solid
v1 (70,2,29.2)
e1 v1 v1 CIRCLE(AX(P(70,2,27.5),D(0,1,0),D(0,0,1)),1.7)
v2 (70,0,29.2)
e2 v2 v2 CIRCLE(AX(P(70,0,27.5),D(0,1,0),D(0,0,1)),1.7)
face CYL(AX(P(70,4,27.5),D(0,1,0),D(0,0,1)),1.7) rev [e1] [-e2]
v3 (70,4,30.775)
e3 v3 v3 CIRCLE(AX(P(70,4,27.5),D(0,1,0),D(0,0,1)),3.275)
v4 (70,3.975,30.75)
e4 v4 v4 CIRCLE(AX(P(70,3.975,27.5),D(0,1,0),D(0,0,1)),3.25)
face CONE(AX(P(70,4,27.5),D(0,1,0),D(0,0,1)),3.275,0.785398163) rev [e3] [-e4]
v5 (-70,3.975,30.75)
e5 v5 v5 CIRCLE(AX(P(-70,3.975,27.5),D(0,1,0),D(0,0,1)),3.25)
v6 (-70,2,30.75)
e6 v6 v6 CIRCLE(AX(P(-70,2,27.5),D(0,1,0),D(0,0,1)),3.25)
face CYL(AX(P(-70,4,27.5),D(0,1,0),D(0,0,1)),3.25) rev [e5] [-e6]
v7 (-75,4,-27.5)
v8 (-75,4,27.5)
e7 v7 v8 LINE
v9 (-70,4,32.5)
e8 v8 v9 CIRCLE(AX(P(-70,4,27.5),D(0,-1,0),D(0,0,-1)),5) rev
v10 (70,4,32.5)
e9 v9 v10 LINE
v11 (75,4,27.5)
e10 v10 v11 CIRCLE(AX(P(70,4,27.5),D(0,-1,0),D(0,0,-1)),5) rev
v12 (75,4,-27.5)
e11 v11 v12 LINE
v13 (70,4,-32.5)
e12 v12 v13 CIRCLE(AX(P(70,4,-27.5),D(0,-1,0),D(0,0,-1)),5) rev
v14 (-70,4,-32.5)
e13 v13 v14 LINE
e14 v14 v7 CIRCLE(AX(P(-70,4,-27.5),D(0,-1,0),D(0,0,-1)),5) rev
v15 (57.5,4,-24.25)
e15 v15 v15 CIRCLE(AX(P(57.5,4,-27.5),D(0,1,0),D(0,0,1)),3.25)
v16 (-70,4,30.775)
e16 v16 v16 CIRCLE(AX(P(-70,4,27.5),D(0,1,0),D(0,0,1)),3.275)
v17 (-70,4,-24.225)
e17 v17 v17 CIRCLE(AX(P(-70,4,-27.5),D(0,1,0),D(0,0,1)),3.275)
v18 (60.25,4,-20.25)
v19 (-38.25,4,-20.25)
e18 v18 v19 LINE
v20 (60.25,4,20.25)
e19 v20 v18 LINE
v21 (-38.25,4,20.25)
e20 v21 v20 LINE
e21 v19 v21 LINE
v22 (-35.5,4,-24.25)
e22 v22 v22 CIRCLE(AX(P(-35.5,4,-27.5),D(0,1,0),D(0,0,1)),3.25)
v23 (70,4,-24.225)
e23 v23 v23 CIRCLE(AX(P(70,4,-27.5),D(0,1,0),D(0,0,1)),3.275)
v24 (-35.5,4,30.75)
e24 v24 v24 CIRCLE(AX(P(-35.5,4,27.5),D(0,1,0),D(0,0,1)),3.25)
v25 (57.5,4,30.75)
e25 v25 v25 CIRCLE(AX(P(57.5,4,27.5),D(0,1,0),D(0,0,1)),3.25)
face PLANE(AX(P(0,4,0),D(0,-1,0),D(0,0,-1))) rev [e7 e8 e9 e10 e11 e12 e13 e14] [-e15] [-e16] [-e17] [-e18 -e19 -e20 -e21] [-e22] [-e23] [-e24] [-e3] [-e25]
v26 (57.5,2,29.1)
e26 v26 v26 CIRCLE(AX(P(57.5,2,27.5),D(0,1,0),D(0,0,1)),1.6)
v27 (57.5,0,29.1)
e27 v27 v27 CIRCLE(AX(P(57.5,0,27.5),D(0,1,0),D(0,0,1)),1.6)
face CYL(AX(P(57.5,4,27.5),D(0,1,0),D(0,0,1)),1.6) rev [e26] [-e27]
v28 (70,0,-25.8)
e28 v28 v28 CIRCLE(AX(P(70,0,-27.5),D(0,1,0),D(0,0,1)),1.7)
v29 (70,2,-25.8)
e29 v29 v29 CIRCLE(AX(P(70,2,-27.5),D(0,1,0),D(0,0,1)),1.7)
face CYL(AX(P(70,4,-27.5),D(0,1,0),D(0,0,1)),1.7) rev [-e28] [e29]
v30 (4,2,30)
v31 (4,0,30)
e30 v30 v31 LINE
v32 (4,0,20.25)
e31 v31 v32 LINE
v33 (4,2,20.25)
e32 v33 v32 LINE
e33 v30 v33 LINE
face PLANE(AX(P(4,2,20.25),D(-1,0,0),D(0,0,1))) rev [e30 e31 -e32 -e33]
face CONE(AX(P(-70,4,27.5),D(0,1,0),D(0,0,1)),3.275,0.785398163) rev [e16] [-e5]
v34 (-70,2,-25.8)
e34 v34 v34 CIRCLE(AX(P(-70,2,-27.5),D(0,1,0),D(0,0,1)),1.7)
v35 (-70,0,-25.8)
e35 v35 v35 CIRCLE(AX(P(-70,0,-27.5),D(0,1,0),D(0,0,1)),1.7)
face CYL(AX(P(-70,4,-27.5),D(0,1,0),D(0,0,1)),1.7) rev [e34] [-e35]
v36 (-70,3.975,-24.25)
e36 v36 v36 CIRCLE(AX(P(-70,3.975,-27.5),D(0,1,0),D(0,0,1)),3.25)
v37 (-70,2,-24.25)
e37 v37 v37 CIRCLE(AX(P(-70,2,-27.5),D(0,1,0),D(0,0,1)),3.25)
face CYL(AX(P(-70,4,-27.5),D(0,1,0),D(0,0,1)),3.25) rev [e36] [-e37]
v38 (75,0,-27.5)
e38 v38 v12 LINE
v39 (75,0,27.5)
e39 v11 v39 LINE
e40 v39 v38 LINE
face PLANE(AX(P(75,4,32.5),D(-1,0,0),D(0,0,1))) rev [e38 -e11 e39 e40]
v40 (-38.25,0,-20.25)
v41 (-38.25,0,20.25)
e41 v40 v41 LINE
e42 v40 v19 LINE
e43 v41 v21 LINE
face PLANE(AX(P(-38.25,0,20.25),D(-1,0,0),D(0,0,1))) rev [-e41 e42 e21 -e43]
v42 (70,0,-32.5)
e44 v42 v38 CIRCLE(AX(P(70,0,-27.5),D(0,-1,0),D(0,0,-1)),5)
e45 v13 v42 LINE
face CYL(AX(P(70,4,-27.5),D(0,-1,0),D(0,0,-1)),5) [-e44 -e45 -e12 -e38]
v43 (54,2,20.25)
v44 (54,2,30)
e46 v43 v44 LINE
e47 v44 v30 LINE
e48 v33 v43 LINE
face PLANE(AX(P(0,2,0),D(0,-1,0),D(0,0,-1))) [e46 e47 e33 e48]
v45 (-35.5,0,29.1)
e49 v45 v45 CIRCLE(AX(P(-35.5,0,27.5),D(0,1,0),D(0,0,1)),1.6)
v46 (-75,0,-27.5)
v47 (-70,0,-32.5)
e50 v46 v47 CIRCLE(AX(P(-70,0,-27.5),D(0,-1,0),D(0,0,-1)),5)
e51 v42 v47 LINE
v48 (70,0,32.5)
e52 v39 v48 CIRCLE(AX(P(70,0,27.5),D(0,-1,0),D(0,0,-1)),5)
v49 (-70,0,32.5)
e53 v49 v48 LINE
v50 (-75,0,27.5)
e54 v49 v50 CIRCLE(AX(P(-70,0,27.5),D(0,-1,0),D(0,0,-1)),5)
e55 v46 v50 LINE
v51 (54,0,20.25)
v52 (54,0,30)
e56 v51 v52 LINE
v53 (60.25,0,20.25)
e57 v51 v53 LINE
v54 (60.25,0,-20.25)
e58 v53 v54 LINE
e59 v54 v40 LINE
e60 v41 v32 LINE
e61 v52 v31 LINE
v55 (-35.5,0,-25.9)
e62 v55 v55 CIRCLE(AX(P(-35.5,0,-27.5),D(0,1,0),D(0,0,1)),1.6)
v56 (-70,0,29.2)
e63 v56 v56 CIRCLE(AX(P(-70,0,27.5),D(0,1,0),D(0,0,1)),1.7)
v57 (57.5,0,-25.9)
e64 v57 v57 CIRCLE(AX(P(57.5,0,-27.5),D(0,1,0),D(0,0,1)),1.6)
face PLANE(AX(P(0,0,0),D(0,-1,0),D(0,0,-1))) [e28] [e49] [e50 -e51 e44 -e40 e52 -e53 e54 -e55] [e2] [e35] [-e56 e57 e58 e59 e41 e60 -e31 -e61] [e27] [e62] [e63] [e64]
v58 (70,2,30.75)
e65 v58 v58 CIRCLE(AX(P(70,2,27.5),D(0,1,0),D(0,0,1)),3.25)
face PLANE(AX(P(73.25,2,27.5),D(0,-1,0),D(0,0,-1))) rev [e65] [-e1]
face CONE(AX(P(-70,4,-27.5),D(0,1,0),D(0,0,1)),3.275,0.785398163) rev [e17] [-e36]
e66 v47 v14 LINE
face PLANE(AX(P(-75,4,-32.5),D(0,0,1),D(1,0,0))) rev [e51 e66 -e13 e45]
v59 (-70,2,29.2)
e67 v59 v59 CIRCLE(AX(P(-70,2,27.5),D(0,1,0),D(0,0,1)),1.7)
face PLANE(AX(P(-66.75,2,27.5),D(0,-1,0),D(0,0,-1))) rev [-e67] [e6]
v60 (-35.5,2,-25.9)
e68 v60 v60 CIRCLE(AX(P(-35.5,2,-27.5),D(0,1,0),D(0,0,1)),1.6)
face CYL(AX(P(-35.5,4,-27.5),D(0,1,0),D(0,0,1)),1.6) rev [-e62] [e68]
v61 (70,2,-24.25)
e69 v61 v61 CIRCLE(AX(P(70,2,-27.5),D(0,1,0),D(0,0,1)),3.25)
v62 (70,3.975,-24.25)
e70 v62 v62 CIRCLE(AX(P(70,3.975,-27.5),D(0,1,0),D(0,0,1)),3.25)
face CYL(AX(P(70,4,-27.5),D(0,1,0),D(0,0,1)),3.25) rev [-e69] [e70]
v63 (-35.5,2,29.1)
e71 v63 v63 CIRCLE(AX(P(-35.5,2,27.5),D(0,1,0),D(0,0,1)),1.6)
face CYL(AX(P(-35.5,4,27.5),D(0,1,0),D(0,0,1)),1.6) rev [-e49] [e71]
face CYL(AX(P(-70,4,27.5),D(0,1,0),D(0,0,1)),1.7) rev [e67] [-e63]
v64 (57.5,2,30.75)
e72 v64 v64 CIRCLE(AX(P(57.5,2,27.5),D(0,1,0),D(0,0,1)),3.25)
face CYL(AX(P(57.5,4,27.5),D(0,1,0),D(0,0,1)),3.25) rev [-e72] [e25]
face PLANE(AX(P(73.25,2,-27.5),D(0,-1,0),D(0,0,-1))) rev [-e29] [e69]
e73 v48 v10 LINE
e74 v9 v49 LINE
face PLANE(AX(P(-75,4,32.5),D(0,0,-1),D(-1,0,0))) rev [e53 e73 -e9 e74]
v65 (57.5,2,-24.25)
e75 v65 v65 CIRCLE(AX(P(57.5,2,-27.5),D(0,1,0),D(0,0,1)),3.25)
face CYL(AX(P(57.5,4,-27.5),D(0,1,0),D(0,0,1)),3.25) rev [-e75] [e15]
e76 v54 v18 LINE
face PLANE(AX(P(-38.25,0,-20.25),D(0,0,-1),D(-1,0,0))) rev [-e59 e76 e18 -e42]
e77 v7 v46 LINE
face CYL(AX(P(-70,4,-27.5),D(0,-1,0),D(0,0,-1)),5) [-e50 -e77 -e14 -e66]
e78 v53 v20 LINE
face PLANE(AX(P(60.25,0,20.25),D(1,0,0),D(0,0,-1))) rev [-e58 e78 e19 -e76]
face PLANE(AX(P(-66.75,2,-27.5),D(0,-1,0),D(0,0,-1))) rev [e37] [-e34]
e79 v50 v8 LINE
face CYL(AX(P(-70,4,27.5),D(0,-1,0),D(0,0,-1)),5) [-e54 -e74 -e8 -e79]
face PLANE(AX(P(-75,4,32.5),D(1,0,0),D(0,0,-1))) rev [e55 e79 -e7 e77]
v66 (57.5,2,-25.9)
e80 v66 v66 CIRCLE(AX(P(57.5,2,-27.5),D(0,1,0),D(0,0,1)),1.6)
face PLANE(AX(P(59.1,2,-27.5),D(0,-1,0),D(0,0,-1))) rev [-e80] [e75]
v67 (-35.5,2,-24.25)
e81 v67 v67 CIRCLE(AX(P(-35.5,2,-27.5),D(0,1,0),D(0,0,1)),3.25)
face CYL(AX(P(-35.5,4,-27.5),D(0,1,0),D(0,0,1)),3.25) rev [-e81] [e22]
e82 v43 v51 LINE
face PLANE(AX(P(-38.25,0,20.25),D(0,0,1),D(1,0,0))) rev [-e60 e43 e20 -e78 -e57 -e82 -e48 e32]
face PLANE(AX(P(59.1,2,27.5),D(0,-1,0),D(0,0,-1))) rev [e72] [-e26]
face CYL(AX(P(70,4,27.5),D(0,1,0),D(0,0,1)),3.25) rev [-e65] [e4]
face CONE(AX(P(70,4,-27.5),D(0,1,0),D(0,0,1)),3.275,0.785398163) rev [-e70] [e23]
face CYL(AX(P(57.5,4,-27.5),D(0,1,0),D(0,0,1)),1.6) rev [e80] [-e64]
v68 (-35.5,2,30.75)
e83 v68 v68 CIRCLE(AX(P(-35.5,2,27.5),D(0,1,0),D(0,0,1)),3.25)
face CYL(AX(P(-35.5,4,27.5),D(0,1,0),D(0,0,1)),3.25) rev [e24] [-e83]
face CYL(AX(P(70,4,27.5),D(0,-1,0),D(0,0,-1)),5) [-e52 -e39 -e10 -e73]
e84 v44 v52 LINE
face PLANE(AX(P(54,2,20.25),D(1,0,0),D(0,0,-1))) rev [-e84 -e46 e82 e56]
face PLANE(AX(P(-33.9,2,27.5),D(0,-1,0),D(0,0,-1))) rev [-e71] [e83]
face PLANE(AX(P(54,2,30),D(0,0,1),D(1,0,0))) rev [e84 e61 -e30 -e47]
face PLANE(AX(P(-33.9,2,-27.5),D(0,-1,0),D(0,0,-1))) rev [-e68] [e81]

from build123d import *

# Parameters (mm, degrees)
SKETCH1_W                          = 150
SKETCH1_H                          = 65
BODY_DEPTH                         = 4
EDGE_FILLETS_R                     = 5
SKETCH5_W                          = 98.5
SKETCH5_H                          = 40.5
LCD2004_SCREEN_CUTOUT_DEPTH        = 82.836727696
LCD2004_MOUNTING_HOLES_START       = 2
LCD2004_MOUNTING_HOLES_OUTLINE_R   = 3.25
LCD2004_MOUNTING_HOLES_DEPTH       = 2
LCD2004_MOUNTING_HOLES_2_OUTLINE_R = 1.6
LCD2004_MOUNTING_HOLES_2_DEPTH     = 2
SKETCH8_W                          = 50
SKETCH8_H                          = 9.75
LCD2004_SOLDERING_CUTOUT_DEPTH     = 2


# Read off the part's stored shape, not the designer's step: mounting_holes, lcd2004_mounting_holes
with BuildPart() as part:
    # Sketch1 → body (new body)
    with BuildSketch(Plane(origin=(0, 0, 0), x_dir=(1, 0, 0), z_dir=(0, 1, 0))):
        Rectangle(SKETCH1_W, SKETCH1_H)
    extrude(amount=BODY_DEPTH)

    # mounting_holes outline → mounting_holes (revolve, cut)
    with BuildSketch(Plane(origin=(70, 0, 27.5), x_dir=(1, 0, 0), z_dir=(0, 0, 1))):
        Polygon((0, 0), (1.7, 0), (1.7, 2), (3.25, 2), (3.25, 3.975), (3.275, 4), (0, 4), align=None)
    revolve(axis=Axis((70, 0, 27.5), (0, 1, 0)), mode=Mode.SUBTRACT)

    # mounting_holes 2 outline → mounting_holes 2 (revolve, cut)
    with BuildSketch(Plane(origin=(-70, 0, -27.5), x_dir=(1, 0, 0), z_dir=(0, 0, 1))):
        Polygon((0, 4), (0, 0), (1.7, 0), (1.7, 2), (3.25, 2), (3.25, 3.975), (3.275, 4), align=None)
    revolve(axis=Axis((-70, 0, -27.5), (0, 1, 0)), mode=Mode.SUBTRACT)

    # mounting_holes 3 outline → mounting_holes 3 (revolve, cut)
    with BuildSketch(Plane(origin=(70, 0, -27.5), x_dir=(1, 0, 0), z_dir=(0, 0, 1))):
        Polygon((0, 4), (0, 0), (1.7, 0), (1.7, 2), (3.25, 2), (3.25, 3.975), (3.275, 4), align=None)
    revolve(axis=Axis((70, 0, -27.5), (0, 1, 0)), mode=Mode.SUBTRACT)

    # mounting_holes 4 outline → mounting_holes 4 (revolve, cut)
    with BuildSketch(Plane(origin=(-70, 0, 27.5), x_dir=(1, 0, 0), z_dir=(0, 0, 1))):
        Polygon((0, 4), (0, 0), (1.7, 0), (1.7, 2), (3.25, 2), (3.25, 3.975), (3.275, 4), align=None)
    revolve(axis=Axis((-70, 0, 27.5), (0, 1, 0)), mode=Mode.SUBTRACT)

    # edge_fillets
    edge_fillets_edges = [part.edges().sort_by_distance(p)[0] for p in [
        (75, 2, 32.5),
        (-75, 2, 32.5),
        (-75, 2, -32.5),
        (75, 2, -32.5),
    ]]
    fillet(edge_fillets_edges, radius=EDGE_FILLETS_R)

    # Sketch5 → lcd2004_screen_cutout (cut, through all)
    with BuildSketch(Plane(origin=(0, 4, 0), x_dir=(1, 0, 0), z_dir=(0, 1, 0))):
        with Locations((11, 0)):
            Rectangle(SKETCH5_W, SKETCH5_H)
    extrude(amount=-LCD2004_SCREEN_CUTOUT_DEPTH, mode=Mode.SUBTRACT)

    # lcd2004_mounting_holes outline → lcd2004_mounting_holes (cut)
    with BuildSketch(Plane(origin=(0, 0, 0), x_dir=(1, 0, 0), z_dir=(0, 1, 0)).offset(LCD2004_MOUNTING_HOLES_START)):
        with Locations((57.5, 27.5)):
            Circle(LCD2004_MOUNTING_HOLES_OUTLINE_R)
        with Locations((-35.5, -27.5)):
            Circle(LCD2004_MOUNTING_HOLES_OUTLINE_R)
        with Locations((57.5, -27.5)):
            Circle(LCD2004_MOUNTING_HOLES_OUTLINE_R)
        with Locations((-35.5, 27.5)):
            Circle(LCD2004_MOUNTING_HOLES_OUTLINE_R)
    extrude(amount=LCD2004_MOUNTING_HOLES_DEPTH, mode=Mode.SUBTRACT)

    # lcd2004_mounting_holes 2 outline → lcd2004_mounting_holes 2 (cut)
    with BuildSketch(Plane(origin=(0, 0, 0), x_dir=(1, 0, 0), z_dir=(0, 1, 0))):
        with Locations((57.5, 27.5)):
            Circle(LCD2004_MOUNTING_HOLES_2_OUTLINE_R)
        with Locations((-35.5, -27.5)):
            Circle(LCD2004_MOUNTING_HOLES_2_OUTLINE_R)
        with Locations((57.5, -27.5)):
            Circle(LCD2004_MOUNTING_HOLES_2_OUTLINE_R)
        with Locations((-35.5, 27.5)):
            Circle(LCD2004_MOUNTING_HOLES_2_OUTLINE_R)
    extrude(amount=LCD2004_MOUNTING_HOLES_2_DEPTH, mode=Mode.SUBTRACT)

    # Sketch8 → lcd2004_soldering_cutout (cut)
    with BuildSketch(Plane.XZ):
        with Locations((29, 25.125)):
            Rectangle(SKETCH8_W, SKETCH8_H)
    extrude(amount=-LCD2004_SOLDERING_CUTOUT_DEPTH, mode=Mode.SUBTRACT)


solid = part.part
